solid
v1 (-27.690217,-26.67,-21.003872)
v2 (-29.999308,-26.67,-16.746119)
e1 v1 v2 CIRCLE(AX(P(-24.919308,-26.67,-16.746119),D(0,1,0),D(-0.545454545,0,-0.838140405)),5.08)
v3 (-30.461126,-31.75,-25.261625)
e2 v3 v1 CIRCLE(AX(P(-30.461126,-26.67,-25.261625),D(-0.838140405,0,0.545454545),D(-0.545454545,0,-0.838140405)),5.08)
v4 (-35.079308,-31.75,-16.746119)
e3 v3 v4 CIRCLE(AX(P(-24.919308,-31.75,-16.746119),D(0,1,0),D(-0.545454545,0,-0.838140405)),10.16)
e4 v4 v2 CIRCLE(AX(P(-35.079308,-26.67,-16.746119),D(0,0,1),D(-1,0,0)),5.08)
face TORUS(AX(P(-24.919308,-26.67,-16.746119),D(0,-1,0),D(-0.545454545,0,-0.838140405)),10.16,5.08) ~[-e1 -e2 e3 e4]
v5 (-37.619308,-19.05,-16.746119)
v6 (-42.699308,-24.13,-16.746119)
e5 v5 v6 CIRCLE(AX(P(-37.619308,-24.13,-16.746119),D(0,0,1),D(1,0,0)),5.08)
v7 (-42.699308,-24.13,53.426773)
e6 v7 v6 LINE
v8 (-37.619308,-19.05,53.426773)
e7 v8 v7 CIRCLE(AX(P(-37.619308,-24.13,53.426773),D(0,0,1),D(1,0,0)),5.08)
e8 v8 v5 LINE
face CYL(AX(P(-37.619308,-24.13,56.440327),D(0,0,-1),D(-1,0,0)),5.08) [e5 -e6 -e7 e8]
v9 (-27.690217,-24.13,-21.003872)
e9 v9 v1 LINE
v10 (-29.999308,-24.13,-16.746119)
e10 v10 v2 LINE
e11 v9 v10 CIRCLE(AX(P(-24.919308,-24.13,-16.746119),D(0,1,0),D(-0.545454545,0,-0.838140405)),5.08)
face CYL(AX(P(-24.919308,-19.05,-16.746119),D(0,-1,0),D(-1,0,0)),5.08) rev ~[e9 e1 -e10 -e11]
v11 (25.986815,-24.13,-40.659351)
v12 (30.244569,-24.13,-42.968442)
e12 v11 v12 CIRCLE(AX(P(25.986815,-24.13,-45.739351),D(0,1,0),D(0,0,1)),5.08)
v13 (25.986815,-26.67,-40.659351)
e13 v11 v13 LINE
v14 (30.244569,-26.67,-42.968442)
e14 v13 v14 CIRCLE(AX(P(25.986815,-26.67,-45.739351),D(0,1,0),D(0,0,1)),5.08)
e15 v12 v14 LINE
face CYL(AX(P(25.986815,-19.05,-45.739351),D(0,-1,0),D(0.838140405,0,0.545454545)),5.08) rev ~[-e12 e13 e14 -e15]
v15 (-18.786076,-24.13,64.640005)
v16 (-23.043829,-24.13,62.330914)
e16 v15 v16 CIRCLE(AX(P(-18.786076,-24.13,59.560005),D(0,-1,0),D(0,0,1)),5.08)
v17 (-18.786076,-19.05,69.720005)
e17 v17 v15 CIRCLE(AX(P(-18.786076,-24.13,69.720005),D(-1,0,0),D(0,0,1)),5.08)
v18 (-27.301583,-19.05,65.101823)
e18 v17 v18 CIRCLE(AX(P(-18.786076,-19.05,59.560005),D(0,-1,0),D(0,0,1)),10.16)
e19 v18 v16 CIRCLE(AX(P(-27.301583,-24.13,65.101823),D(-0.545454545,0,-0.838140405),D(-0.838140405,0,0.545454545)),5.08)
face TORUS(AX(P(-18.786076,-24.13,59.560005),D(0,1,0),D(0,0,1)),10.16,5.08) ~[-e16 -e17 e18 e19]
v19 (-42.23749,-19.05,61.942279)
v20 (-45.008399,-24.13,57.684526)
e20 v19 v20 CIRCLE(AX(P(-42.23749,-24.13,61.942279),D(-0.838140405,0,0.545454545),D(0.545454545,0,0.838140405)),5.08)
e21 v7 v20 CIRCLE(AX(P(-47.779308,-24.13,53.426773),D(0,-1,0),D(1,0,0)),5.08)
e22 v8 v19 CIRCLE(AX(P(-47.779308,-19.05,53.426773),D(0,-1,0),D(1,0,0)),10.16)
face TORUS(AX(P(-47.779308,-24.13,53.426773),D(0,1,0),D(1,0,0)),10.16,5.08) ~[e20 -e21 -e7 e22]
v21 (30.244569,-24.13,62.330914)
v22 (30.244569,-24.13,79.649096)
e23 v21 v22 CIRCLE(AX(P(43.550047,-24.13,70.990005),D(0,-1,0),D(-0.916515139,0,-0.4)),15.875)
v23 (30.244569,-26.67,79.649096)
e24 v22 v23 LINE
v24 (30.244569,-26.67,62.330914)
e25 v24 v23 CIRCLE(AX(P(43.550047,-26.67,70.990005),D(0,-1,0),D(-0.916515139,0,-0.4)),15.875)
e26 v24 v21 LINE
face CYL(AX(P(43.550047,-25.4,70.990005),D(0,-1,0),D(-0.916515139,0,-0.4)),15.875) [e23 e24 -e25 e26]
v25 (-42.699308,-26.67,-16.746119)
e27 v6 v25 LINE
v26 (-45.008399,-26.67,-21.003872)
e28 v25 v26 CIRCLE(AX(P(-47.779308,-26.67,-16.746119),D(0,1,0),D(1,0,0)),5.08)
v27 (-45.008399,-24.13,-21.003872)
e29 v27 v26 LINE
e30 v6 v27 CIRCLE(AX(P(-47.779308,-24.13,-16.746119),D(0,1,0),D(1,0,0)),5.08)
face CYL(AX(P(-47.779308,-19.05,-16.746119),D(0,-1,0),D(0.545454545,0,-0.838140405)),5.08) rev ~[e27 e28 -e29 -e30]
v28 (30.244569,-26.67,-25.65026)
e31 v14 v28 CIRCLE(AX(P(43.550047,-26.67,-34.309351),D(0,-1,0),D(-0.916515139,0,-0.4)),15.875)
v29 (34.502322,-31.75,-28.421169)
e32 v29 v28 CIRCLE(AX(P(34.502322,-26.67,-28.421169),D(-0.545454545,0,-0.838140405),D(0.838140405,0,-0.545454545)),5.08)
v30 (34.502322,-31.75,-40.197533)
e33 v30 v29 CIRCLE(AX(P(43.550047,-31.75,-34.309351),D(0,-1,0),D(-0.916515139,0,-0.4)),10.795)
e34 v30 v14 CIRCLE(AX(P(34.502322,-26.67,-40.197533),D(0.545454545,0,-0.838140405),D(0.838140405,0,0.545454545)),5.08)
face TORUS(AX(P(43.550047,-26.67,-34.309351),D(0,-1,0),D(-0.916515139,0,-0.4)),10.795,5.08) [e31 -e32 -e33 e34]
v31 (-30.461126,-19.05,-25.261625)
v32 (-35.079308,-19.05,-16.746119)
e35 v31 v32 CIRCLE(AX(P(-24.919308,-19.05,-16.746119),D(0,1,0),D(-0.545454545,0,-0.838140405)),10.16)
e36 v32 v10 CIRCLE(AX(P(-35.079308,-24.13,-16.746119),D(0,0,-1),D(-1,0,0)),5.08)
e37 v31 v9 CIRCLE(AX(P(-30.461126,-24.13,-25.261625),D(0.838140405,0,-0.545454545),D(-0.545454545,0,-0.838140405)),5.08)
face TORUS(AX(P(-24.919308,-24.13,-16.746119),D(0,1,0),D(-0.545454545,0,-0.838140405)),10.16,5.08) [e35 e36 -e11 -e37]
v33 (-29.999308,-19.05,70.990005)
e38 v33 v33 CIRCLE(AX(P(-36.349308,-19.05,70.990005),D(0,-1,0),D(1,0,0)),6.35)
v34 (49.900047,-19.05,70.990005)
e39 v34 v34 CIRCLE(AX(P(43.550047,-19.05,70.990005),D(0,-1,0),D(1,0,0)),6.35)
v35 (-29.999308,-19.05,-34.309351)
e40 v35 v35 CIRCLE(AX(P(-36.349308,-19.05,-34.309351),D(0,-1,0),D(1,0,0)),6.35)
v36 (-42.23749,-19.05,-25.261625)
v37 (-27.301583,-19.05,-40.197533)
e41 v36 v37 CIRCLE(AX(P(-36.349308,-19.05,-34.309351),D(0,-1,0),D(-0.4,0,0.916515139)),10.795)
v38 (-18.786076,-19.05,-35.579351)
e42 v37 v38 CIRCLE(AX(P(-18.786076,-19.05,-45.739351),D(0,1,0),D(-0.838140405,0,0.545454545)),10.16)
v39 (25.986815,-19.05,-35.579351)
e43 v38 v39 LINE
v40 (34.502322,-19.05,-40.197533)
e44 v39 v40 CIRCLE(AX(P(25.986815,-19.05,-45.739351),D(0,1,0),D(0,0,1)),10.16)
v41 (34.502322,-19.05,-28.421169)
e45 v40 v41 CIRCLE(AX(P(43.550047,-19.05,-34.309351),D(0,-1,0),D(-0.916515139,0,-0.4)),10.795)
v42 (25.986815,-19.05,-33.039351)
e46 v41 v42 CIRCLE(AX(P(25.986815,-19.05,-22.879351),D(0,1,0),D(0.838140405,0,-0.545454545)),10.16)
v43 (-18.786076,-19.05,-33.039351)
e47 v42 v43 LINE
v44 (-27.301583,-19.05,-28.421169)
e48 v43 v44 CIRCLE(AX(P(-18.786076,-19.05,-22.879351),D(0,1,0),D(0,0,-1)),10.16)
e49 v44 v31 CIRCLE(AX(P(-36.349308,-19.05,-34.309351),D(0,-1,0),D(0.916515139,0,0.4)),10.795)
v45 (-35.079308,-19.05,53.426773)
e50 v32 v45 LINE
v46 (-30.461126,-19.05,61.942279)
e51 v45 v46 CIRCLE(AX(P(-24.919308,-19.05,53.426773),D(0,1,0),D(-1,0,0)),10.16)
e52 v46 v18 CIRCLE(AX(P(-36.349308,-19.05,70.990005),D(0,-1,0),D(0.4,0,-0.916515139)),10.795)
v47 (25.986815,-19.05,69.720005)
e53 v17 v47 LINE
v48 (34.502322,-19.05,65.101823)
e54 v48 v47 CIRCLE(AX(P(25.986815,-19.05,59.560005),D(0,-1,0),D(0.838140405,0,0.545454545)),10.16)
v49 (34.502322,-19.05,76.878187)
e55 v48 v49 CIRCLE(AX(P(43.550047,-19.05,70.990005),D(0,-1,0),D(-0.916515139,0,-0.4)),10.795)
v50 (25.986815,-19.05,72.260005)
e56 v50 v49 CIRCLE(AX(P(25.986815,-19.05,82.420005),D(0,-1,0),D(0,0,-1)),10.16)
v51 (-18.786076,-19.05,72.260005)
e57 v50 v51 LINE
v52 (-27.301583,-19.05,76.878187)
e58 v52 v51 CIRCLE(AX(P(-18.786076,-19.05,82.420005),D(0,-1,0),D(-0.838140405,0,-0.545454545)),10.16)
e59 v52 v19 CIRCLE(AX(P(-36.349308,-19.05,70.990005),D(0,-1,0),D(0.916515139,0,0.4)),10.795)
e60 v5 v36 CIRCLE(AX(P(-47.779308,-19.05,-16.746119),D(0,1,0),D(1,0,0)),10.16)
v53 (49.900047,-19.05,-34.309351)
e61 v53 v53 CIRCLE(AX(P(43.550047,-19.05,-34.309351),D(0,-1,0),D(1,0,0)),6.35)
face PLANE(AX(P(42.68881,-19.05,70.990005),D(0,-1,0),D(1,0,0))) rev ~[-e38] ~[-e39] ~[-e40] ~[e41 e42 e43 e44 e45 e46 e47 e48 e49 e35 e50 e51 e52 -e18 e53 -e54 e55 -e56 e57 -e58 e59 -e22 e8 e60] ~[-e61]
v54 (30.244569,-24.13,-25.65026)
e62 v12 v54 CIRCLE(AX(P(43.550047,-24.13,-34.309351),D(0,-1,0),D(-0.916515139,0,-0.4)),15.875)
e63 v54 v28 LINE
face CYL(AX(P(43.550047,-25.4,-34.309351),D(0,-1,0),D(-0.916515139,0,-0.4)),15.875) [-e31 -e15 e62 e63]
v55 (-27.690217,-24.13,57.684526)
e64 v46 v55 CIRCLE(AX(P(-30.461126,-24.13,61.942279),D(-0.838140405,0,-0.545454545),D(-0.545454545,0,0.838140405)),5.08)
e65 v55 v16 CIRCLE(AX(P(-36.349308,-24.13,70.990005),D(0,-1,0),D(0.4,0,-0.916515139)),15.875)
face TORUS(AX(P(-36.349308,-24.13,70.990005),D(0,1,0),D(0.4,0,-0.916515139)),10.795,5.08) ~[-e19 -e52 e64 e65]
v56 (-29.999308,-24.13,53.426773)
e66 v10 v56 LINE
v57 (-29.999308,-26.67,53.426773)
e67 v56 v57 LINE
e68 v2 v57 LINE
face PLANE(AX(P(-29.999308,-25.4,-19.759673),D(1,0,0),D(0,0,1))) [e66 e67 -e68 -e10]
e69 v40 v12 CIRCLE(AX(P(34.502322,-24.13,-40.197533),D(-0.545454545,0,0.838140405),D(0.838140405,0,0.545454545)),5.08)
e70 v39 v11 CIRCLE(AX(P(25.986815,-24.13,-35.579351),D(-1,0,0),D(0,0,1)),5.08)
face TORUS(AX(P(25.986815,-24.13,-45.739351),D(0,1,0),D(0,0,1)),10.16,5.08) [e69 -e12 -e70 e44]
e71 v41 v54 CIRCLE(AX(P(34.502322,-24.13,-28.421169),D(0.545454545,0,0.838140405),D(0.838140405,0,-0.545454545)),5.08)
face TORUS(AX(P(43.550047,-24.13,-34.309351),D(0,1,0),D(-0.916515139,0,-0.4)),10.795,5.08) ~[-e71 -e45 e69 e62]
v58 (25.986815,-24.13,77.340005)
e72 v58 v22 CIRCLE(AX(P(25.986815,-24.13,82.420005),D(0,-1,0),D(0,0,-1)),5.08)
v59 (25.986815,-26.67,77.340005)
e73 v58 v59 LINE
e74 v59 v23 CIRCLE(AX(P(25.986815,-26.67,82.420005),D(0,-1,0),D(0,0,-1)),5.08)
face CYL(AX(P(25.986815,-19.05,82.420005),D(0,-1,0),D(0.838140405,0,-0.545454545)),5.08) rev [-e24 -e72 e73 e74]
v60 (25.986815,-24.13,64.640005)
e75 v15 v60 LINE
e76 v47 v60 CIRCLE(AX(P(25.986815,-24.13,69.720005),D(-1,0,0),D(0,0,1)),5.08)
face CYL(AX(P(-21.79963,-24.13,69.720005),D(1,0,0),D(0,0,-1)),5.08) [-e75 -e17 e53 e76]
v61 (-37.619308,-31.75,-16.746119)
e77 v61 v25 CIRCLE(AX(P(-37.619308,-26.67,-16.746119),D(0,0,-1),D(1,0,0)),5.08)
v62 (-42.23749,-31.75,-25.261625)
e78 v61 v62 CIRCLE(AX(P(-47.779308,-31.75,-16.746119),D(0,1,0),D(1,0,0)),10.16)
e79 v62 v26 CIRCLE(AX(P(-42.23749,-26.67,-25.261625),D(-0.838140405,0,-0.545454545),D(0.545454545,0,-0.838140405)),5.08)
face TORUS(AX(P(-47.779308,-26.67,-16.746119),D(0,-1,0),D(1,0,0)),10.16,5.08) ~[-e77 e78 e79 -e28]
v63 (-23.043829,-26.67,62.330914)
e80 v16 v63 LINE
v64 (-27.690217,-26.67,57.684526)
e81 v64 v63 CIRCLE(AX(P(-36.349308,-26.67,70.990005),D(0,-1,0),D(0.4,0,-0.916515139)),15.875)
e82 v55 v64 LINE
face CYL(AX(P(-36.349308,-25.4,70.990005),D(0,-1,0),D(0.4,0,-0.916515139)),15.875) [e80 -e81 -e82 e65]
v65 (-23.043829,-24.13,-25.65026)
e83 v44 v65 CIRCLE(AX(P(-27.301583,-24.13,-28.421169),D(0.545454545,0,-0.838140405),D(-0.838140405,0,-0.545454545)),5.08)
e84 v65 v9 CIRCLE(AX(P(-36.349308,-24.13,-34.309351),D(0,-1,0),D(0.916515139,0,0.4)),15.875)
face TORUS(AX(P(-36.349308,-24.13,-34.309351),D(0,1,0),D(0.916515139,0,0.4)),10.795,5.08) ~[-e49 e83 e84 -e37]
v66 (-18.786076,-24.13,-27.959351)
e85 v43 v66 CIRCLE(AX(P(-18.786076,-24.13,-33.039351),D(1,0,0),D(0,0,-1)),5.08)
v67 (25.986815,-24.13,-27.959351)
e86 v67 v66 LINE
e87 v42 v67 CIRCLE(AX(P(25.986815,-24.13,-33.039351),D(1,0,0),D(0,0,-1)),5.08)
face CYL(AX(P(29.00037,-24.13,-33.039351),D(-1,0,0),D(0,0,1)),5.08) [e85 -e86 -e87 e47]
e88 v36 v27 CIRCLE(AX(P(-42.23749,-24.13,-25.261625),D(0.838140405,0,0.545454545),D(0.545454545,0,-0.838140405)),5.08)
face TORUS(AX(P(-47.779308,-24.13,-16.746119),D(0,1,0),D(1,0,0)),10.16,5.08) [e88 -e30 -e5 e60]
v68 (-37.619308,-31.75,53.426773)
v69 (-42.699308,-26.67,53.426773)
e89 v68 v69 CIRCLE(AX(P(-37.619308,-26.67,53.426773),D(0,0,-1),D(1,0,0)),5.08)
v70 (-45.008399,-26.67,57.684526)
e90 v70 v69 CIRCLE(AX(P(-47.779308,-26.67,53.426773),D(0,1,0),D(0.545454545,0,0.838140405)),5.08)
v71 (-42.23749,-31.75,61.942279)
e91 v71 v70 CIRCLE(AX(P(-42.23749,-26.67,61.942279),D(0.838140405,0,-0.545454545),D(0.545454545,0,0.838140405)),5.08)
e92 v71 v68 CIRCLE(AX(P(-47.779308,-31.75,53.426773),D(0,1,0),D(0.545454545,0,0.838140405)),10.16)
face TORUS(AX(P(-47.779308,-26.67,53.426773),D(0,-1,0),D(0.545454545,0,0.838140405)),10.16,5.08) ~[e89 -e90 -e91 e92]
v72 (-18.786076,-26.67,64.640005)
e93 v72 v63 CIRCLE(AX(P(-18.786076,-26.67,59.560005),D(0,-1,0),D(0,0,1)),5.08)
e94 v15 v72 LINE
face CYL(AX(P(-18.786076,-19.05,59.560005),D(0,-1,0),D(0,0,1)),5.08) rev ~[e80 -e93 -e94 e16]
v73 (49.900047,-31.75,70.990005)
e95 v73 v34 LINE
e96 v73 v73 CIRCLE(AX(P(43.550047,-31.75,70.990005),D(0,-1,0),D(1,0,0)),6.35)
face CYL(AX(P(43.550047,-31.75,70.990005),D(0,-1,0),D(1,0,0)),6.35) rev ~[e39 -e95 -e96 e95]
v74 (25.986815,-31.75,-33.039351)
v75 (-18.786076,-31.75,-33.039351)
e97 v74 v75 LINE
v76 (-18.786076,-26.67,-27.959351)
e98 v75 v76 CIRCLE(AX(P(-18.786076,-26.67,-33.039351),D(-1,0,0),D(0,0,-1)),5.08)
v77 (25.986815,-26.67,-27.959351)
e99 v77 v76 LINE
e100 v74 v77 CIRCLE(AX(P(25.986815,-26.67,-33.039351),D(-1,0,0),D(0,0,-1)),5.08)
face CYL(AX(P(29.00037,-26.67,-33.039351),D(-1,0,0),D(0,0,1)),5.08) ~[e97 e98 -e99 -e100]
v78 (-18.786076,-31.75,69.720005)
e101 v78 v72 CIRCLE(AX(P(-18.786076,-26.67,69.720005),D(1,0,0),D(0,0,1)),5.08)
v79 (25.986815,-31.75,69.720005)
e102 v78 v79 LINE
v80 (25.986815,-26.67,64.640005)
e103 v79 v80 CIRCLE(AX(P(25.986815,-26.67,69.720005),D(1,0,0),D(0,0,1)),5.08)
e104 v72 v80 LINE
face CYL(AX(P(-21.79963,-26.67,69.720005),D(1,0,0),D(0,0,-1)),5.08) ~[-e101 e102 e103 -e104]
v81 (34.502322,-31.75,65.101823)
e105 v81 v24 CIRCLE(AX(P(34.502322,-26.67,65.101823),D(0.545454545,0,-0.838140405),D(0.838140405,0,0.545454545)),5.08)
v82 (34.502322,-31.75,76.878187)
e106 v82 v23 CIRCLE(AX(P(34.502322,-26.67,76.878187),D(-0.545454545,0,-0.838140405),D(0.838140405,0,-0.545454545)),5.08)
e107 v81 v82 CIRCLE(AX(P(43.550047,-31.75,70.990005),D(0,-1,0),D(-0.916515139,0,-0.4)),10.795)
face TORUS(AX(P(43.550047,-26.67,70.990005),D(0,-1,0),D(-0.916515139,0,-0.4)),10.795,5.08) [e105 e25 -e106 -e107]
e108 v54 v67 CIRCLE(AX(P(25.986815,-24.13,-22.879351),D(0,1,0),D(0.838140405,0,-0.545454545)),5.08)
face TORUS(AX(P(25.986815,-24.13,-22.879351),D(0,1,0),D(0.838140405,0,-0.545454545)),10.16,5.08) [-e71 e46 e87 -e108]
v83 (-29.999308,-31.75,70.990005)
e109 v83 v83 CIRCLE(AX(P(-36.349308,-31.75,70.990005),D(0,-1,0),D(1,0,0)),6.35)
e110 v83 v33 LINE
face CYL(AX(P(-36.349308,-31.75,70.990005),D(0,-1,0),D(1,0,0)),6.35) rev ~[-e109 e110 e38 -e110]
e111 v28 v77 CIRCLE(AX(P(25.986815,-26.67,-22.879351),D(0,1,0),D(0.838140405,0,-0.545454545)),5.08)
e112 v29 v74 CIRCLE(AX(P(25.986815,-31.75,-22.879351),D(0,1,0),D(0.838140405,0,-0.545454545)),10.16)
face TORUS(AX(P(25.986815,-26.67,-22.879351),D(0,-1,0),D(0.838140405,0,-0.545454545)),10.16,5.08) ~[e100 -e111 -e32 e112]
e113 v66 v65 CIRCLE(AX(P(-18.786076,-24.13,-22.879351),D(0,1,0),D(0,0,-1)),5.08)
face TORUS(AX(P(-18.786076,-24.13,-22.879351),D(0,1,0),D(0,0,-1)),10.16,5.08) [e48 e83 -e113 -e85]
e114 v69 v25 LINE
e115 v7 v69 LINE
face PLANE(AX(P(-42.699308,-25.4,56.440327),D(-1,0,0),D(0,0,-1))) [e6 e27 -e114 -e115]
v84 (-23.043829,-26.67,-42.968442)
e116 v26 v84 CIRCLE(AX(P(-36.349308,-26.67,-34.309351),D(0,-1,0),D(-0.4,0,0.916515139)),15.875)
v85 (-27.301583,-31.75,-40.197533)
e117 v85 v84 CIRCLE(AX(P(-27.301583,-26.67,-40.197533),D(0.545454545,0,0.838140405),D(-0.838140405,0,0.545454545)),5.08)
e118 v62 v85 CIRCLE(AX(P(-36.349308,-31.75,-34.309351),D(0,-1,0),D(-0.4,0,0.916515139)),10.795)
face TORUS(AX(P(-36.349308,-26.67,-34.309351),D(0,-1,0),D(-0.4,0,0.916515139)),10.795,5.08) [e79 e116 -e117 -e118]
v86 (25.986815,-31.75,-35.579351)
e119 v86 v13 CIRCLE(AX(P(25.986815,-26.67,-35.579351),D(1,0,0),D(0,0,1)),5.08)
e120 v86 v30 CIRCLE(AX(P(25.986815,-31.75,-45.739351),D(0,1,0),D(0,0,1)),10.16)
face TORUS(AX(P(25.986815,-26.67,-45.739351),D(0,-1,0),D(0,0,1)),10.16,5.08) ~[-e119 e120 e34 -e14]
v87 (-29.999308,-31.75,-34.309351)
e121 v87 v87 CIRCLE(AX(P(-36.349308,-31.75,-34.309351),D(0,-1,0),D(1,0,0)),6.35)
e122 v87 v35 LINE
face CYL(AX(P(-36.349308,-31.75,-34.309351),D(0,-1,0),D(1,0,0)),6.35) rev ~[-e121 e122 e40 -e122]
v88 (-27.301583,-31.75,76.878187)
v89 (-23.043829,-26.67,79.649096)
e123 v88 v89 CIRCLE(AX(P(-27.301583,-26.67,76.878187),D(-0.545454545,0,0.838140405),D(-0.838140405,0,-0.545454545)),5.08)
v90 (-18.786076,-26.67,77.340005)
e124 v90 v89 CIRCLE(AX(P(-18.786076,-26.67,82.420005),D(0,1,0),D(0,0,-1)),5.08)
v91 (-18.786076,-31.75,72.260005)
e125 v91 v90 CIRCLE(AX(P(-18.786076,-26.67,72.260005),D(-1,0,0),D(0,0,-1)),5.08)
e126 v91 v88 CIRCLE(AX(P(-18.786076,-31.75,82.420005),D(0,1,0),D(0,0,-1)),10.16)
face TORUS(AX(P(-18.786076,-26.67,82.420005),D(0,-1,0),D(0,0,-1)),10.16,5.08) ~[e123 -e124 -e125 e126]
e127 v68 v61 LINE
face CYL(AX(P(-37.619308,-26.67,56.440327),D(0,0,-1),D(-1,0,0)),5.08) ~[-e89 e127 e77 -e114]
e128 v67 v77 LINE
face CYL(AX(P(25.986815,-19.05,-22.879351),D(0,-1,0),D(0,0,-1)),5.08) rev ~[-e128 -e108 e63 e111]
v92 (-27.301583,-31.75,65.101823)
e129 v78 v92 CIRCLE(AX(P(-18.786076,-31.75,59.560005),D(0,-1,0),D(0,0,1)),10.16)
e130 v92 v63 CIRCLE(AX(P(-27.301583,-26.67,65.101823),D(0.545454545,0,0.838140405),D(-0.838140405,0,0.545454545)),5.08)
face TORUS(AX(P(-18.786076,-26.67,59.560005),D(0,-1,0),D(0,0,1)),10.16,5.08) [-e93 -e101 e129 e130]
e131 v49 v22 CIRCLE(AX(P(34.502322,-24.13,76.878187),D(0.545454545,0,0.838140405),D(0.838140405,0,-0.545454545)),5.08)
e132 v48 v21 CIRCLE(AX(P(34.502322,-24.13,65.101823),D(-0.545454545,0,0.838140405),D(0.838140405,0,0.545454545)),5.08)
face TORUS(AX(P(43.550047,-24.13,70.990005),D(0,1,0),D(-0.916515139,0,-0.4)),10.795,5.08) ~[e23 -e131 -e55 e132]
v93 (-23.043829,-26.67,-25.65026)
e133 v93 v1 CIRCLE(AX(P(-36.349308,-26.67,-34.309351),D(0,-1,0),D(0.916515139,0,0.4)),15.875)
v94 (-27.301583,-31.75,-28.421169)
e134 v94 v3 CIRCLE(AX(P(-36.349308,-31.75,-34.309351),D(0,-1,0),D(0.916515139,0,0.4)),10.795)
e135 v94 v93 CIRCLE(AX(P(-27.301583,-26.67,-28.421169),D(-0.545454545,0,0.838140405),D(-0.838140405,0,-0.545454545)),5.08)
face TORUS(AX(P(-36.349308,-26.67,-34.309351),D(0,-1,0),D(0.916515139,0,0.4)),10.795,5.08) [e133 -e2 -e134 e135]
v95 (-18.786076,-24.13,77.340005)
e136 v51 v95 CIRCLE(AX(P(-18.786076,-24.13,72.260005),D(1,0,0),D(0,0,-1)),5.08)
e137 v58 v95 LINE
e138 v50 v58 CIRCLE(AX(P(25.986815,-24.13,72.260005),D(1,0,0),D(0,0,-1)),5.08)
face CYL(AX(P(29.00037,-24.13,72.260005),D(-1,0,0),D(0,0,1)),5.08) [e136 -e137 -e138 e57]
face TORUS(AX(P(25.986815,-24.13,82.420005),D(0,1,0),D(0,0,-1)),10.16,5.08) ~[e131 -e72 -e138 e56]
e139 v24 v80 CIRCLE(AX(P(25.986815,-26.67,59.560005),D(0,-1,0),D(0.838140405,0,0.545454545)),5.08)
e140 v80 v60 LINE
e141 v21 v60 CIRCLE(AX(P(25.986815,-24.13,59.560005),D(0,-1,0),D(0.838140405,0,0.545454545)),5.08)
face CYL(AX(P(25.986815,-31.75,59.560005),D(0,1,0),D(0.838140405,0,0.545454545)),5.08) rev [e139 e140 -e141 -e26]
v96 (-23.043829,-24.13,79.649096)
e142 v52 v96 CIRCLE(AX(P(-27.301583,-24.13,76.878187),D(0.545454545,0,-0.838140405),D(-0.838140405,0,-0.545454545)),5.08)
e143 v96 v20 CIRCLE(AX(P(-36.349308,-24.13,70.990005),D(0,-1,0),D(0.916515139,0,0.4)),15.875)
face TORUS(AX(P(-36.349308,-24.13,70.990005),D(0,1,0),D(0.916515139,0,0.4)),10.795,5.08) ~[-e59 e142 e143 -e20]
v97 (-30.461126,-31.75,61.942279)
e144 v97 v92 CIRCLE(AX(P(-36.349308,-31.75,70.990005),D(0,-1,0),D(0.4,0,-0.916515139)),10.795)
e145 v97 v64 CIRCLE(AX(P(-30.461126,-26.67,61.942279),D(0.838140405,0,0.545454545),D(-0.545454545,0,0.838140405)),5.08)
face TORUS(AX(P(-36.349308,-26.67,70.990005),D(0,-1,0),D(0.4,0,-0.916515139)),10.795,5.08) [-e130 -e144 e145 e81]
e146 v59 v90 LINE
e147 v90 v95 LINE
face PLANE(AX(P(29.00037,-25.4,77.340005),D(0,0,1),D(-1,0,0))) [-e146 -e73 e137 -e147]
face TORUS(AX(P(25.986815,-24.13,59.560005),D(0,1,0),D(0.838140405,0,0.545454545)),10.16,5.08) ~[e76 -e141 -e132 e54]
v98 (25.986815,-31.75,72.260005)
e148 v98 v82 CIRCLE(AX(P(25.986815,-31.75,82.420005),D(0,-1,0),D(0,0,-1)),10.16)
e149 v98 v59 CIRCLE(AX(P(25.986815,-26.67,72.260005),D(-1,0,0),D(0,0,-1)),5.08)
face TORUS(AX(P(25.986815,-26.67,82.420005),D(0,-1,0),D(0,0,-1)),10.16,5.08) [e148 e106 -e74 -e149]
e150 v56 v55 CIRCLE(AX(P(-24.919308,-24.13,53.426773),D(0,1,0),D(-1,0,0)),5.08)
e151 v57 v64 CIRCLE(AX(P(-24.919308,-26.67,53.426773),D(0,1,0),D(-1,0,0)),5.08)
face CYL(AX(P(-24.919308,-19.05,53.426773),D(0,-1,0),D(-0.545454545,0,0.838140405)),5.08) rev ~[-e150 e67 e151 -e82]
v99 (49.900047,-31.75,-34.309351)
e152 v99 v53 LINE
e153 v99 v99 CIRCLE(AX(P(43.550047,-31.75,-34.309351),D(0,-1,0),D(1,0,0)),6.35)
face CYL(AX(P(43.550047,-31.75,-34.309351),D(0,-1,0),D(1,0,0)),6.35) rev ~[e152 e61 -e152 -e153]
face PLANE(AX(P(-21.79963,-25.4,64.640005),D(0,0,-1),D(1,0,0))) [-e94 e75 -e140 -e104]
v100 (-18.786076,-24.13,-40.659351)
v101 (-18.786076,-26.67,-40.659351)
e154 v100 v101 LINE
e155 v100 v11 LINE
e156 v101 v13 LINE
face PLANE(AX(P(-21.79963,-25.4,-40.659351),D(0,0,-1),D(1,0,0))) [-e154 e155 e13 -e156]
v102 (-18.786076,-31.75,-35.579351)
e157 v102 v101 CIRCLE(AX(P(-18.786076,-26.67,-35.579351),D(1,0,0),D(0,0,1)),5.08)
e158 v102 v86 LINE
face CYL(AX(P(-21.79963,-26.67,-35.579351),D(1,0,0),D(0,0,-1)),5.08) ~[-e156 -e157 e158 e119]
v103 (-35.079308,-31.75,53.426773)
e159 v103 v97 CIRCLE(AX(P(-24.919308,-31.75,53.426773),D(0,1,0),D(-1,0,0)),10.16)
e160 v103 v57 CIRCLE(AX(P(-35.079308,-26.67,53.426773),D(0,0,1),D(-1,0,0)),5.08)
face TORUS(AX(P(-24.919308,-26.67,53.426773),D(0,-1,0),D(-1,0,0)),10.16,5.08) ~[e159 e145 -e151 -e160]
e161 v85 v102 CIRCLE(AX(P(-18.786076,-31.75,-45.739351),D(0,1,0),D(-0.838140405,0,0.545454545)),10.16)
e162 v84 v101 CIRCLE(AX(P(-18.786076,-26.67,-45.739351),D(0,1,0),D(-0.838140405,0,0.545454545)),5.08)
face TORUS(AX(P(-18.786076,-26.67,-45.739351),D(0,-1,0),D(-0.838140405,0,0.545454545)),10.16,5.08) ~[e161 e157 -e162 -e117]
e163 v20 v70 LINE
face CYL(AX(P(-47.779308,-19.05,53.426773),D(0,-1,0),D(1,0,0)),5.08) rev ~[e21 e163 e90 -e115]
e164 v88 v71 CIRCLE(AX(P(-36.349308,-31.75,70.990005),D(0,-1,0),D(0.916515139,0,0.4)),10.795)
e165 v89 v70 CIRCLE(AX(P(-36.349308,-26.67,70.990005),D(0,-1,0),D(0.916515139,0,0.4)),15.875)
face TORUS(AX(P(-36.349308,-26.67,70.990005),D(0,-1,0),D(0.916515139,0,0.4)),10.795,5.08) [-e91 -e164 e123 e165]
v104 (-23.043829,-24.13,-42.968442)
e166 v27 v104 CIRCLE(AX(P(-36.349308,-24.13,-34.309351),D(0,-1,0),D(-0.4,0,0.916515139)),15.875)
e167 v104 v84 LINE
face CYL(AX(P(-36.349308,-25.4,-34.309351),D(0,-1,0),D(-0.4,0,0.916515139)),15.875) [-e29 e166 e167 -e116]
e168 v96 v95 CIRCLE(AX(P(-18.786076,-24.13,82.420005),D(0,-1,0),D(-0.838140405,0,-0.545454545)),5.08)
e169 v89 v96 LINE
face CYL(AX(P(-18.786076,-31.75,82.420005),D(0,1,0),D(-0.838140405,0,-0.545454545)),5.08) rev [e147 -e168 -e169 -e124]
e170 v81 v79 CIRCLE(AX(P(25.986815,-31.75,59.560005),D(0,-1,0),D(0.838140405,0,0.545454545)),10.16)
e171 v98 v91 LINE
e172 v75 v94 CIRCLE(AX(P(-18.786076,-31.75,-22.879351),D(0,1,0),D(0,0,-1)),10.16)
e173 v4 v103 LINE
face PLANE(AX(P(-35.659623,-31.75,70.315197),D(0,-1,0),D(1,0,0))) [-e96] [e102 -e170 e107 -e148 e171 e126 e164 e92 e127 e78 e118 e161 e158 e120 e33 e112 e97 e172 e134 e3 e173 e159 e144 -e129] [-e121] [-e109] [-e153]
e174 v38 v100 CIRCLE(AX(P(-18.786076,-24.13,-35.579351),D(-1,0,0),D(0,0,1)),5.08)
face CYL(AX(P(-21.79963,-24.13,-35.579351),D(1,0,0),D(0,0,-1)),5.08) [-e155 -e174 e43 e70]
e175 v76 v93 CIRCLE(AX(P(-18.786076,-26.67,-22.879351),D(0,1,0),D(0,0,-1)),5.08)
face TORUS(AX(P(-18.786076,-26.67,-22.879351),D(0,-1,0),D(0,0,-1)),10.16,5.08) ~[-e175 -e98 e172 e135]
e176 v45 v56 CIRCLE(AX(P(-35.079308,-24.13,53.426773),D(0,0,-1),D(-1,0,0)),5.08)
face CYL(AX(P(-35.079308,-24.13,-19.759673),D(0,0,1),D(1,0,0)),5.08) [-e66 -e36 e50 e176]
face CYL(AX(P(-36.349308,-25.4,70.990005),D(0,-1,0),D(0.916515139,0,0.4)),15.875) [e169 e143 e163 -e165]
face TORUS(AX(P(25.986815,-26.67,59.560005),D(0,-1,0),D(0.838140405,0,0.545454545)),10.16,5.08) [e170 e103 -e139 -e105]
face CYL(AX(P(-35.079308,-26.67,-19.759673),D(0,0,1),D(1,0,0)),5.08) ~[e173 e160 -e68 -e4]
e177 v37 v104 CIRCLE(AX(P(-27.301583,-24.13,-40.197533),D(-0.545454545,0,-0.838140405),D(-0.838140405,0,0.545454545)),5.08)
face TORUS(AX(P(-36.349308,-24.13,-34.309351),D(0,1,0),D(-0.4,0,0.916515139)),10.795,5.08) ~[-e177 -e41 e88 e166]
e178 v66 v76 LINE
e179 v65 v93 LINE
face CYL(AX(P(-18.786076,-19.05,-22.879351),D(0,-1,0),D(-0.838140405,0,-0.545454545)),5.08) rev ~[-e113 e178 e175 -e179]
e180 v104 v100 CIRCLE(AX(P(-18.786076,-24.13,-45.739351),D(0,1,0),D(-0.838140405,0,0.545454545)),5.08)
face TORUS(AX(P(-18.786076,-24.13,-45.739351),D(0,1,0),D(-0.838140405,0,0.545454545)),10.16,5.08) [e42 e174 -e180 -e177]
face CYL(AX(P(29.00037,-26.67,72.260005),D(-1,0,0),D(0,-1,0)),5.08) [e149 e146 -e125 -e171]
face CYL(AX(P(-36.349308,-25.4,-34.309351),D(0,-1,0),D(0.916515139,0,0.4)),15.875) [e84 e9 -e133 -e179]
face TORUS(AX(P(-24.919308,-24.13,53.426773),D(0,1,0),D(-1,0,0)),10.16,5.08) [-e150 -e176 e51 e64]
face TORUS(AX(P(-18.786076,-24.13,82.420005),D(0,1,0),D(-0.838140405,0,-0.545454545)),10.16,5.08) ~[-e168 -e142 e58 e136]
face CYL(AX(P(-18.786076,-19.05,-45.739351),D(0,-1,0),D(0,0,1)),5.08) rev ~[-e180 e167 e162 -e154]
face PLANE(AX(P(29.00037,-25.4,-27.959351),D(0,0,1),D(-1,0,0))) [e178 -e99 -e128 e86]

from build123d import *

# Parameters (mm, degrees)
F1_DEPTH = 6.35
F2_DEPTH = 6.35
F3_R     = 5.08
F4_R     = 6.35
F5_DEPTH = 12.701


with BuildPart() as f1:
    # F0 (on Front) → F1 (new body, symmetric)
    with BuildSketch(Plane.XZ):
        with BuildLine():
            ThreePointArc((-21.7996303504, 64.6400047008), (-20.8091704641, 67.7465891072), (-20.4743081819, 70.9900047008))
            ThreePointArc((-20.4743081819, 70.9900047008), (-20.8091704641, 74.2334202943), (-21.7996303504, 77.3400047008))
            ThreePointArc((-21.7996303504, 77.3400047008), (-47.5746283332, 82.2153248521), (-42.6993081819, 56.4403268693))
            ThreePointArc((-42.6993081819, 56.4403268693), (-36.3493081819, 55.1150047008), (-29.9993081819, 56.4403268693))
            ThreePointArc((-29.9993081819, 56.4403268693), (-25.1239880306, 59.7646845494), (-21.7996303504, 64.6400047008))
        make_face()
        with BuildLine():
            ThreePointArc((-21.7996303504, 77.3400047008), (-20.8091704641, 74.2334202943), (-20.4743081819, 70.9900047008))
            ThreePointArc((-20.4743081819, 70.9900047008), (-20.8091704641, 67.7465891072), (-21.7996303504, 64.6400047008))
            Line((-21.7996303504, 64.6400047008), (29.0003696496, 64.6400047008))
            ThreePointArc((29.0003696496, 64.6400047008), (27.6750474811, 70.9900047008), (29.0003696496, 77.3400047008))
            Line((29.0003696496, 77.3400047008), (-21.7996303504, 77.3400047008))
        make_face()
        with BuildLine():
            ThreePointArc((29.0003696496, -27.9593509622), (27.6750474811, -34.3093509622), (29.0003696496, -40.6593509622))
            ThreePointArc((29.0003696496, -40.6593509622), (46.7934630746, -49.84948868), (59.4250474811, -34.3093509622))
            ThreePointArc((59.4250474811, -34.3093509622), (46.7934630746, -18.7692132444), (29.0003696496, -27.9593509622))
        make_face()
        with BuildLine():
            ThreePointArc((-20.4743081819, -34.3093509622), (-20.8091704641, -37.5527665558), (-21.7996303504, -40.6593509622))
            Line((-21.7996303504, -40.6593509622), (29.0003696496, -40.6593509622))
            ThreePointArc((29.0003696496, -40.6593509622), (27.6750474811, -34.3093509622), (29.0003696496, -27.9593509622))
            Line((29.0003696496, -27.9593509622), (-21.7996303504, -27.9593509622))
            ThreePointArc((-21.7996303504, -27.9593509622), (-20.8091704641, -31.0659353686), (-20.4743081819, -34.3093509622))
        make_face()
        with BuildLine():
            ThreePointArc((-29.9993081819, -19.7596731307), (-36.3493081819, -18.4343509622), (-42.6993081819, -19.7596731307))
            ThreePointArc((-42.6993081819, -19.7596731307), (-47.5746283332, -45.5346711135), (-21.7996303504, -40.6593509622))
            ThreePointArc((-21.7996303504, -40.6593509622), (-20.8091704641, -37.5527665558), (-20.4743081819, -34.3093509622))
            ThreePointArc((-20.4743081819, -34.3093509622), (-20.8091704641, -31.0659353686), (-21.7996303504, -27.9593509622))
            ThreePointArc((-21.7996303504, -27.9593509622), (-25.1239880306, -23.0840308109), (-29.9993081819, -19.7596731307))
        make_face()
        with BuildLine():
            ThreePointArc((-29.9993081819, 56.4403268693), (-36.3493081819, 55.1150047008), (-42.6993081819, 56.4403268693))
            Line((-42.6993081819, 56.4403268693), (-42.6993081819, -19.7596731307))
            ThreePointArc((-42.6993081819, -19.7596731307), (-36.3493081819, -18.4343509622), (-29.9993081819, -19.7596731307))
            Line((-29.9993081819, -19.7596731307), (-29.9993081819, 56.4403268693))
        make_face()
    extrude(amount=F1_DEPTH, both=True)

    # F0 (on Front) → F2 (join, symmetric)
    with BuildSketch(Plane.XZ):
        with BuildLine():
            ThreePointArc((59.4250474811, 70.9900047008), (46.7934630746, 86.5301424186), (29.0003696496, 77.3400047008))
            ThreePointArc((29.0003696496, 77.3400047008), (27.6750474811, 70.9900047008), (29.0003696496, 64.6400047008))
            ThreePointArc((29.0003696496, 64.6400047008), (46.7934630746, 55.449866983), (59.4250474811, 70.9900047008))
        make_face()
    extrude(amount=F2_DEPTH, both=True)

    # F3
    f3_edges = [f1.edges().sort_by_distance(p)[0] for p in [
        (29.00037, 0, 77.340005),
        (3.60037, 6.35, 77.340005),
        (-21.79963, 0, 77.340005),
        (3.60037, -6.35, 77.340005),
        (-47.574628, 6.35, 82.215325),
        (-42.699308, 0, 56.440327),
        (-47.574628, -6.35, 82.215325),
        (29.00037, 0, 64.640005),
        (59.425047, 6.35, 70.990005),
        (59.425047, -6.35, 70.990005),
        (-25.123988, -6.35, 59.764685),
        (-25.123988, 6.35, 59.764685),
        (-21.79963, 0, 64.640005),
        (-29.999308, 0, 56.440327),
        (3.60037, -6.35, 64.640005),
        (-42.699308, -6.35, 18.340327),
        (-47.574628, -6.35, -45.534671),
        (3.60037, -6.35, -40.659351),
        (59.425047, -6.35, -34.309351),
        (3.60037, -6.35, -27.959351),
        (-25.123988, -6.35, -23.084031),
        (-29.999308, -6.35, 18.340327),
        (3.60037, 6.35, 64.640005),
        (-42.699308, 6.35, 18.340327),
        (-47.574628, 6.35, -45.534671),
        (3.60037, 6.35, -40.659351),
        (59.425047, 6.35, -34.309351),
        (3.60037, 6.35, -27.959351),
        (-25.123988, 6.35, -23.084031),
        (-29.999308, 6.35, 18.340327),
        (29.00037, 0, -40.659351),
        (29.00037, 0, -27.959351),
        (-21.79963, 0, -27.959351),
        (-29.999308, 0, -19.759673),
        (-42.699308, 0, -19.759673),
        (-21.79963, 0, -40.659351),
    ]]
    fillet(f3_edges, radius=F3_R)

    # F4 (on face) → F5 (cut, through all)
    with BuildSketch(Plane.XZ.offset(6.35)):
        with Locations((-36.3493081819, 70.9900047008)):
            Circle(F4_R)
        with Locations((43.5500474811, 70.9900047008)):
            Circle(F4_R)
        with Locations((-36.3493081819, -34.3093509622)):
            Circle(F4_R)
        with Locations((43.5500474811, -34.3093509622)):
            Circle(F4_R)
    extrude(amount=-F5_DEPTH, mode=Mode.SUBTRACT)


with BuildPart() as f1_1:
    # F6: moved
    add(f1.part.moved(Location((0, -25.4, 0))))


solid = f1_1.part
